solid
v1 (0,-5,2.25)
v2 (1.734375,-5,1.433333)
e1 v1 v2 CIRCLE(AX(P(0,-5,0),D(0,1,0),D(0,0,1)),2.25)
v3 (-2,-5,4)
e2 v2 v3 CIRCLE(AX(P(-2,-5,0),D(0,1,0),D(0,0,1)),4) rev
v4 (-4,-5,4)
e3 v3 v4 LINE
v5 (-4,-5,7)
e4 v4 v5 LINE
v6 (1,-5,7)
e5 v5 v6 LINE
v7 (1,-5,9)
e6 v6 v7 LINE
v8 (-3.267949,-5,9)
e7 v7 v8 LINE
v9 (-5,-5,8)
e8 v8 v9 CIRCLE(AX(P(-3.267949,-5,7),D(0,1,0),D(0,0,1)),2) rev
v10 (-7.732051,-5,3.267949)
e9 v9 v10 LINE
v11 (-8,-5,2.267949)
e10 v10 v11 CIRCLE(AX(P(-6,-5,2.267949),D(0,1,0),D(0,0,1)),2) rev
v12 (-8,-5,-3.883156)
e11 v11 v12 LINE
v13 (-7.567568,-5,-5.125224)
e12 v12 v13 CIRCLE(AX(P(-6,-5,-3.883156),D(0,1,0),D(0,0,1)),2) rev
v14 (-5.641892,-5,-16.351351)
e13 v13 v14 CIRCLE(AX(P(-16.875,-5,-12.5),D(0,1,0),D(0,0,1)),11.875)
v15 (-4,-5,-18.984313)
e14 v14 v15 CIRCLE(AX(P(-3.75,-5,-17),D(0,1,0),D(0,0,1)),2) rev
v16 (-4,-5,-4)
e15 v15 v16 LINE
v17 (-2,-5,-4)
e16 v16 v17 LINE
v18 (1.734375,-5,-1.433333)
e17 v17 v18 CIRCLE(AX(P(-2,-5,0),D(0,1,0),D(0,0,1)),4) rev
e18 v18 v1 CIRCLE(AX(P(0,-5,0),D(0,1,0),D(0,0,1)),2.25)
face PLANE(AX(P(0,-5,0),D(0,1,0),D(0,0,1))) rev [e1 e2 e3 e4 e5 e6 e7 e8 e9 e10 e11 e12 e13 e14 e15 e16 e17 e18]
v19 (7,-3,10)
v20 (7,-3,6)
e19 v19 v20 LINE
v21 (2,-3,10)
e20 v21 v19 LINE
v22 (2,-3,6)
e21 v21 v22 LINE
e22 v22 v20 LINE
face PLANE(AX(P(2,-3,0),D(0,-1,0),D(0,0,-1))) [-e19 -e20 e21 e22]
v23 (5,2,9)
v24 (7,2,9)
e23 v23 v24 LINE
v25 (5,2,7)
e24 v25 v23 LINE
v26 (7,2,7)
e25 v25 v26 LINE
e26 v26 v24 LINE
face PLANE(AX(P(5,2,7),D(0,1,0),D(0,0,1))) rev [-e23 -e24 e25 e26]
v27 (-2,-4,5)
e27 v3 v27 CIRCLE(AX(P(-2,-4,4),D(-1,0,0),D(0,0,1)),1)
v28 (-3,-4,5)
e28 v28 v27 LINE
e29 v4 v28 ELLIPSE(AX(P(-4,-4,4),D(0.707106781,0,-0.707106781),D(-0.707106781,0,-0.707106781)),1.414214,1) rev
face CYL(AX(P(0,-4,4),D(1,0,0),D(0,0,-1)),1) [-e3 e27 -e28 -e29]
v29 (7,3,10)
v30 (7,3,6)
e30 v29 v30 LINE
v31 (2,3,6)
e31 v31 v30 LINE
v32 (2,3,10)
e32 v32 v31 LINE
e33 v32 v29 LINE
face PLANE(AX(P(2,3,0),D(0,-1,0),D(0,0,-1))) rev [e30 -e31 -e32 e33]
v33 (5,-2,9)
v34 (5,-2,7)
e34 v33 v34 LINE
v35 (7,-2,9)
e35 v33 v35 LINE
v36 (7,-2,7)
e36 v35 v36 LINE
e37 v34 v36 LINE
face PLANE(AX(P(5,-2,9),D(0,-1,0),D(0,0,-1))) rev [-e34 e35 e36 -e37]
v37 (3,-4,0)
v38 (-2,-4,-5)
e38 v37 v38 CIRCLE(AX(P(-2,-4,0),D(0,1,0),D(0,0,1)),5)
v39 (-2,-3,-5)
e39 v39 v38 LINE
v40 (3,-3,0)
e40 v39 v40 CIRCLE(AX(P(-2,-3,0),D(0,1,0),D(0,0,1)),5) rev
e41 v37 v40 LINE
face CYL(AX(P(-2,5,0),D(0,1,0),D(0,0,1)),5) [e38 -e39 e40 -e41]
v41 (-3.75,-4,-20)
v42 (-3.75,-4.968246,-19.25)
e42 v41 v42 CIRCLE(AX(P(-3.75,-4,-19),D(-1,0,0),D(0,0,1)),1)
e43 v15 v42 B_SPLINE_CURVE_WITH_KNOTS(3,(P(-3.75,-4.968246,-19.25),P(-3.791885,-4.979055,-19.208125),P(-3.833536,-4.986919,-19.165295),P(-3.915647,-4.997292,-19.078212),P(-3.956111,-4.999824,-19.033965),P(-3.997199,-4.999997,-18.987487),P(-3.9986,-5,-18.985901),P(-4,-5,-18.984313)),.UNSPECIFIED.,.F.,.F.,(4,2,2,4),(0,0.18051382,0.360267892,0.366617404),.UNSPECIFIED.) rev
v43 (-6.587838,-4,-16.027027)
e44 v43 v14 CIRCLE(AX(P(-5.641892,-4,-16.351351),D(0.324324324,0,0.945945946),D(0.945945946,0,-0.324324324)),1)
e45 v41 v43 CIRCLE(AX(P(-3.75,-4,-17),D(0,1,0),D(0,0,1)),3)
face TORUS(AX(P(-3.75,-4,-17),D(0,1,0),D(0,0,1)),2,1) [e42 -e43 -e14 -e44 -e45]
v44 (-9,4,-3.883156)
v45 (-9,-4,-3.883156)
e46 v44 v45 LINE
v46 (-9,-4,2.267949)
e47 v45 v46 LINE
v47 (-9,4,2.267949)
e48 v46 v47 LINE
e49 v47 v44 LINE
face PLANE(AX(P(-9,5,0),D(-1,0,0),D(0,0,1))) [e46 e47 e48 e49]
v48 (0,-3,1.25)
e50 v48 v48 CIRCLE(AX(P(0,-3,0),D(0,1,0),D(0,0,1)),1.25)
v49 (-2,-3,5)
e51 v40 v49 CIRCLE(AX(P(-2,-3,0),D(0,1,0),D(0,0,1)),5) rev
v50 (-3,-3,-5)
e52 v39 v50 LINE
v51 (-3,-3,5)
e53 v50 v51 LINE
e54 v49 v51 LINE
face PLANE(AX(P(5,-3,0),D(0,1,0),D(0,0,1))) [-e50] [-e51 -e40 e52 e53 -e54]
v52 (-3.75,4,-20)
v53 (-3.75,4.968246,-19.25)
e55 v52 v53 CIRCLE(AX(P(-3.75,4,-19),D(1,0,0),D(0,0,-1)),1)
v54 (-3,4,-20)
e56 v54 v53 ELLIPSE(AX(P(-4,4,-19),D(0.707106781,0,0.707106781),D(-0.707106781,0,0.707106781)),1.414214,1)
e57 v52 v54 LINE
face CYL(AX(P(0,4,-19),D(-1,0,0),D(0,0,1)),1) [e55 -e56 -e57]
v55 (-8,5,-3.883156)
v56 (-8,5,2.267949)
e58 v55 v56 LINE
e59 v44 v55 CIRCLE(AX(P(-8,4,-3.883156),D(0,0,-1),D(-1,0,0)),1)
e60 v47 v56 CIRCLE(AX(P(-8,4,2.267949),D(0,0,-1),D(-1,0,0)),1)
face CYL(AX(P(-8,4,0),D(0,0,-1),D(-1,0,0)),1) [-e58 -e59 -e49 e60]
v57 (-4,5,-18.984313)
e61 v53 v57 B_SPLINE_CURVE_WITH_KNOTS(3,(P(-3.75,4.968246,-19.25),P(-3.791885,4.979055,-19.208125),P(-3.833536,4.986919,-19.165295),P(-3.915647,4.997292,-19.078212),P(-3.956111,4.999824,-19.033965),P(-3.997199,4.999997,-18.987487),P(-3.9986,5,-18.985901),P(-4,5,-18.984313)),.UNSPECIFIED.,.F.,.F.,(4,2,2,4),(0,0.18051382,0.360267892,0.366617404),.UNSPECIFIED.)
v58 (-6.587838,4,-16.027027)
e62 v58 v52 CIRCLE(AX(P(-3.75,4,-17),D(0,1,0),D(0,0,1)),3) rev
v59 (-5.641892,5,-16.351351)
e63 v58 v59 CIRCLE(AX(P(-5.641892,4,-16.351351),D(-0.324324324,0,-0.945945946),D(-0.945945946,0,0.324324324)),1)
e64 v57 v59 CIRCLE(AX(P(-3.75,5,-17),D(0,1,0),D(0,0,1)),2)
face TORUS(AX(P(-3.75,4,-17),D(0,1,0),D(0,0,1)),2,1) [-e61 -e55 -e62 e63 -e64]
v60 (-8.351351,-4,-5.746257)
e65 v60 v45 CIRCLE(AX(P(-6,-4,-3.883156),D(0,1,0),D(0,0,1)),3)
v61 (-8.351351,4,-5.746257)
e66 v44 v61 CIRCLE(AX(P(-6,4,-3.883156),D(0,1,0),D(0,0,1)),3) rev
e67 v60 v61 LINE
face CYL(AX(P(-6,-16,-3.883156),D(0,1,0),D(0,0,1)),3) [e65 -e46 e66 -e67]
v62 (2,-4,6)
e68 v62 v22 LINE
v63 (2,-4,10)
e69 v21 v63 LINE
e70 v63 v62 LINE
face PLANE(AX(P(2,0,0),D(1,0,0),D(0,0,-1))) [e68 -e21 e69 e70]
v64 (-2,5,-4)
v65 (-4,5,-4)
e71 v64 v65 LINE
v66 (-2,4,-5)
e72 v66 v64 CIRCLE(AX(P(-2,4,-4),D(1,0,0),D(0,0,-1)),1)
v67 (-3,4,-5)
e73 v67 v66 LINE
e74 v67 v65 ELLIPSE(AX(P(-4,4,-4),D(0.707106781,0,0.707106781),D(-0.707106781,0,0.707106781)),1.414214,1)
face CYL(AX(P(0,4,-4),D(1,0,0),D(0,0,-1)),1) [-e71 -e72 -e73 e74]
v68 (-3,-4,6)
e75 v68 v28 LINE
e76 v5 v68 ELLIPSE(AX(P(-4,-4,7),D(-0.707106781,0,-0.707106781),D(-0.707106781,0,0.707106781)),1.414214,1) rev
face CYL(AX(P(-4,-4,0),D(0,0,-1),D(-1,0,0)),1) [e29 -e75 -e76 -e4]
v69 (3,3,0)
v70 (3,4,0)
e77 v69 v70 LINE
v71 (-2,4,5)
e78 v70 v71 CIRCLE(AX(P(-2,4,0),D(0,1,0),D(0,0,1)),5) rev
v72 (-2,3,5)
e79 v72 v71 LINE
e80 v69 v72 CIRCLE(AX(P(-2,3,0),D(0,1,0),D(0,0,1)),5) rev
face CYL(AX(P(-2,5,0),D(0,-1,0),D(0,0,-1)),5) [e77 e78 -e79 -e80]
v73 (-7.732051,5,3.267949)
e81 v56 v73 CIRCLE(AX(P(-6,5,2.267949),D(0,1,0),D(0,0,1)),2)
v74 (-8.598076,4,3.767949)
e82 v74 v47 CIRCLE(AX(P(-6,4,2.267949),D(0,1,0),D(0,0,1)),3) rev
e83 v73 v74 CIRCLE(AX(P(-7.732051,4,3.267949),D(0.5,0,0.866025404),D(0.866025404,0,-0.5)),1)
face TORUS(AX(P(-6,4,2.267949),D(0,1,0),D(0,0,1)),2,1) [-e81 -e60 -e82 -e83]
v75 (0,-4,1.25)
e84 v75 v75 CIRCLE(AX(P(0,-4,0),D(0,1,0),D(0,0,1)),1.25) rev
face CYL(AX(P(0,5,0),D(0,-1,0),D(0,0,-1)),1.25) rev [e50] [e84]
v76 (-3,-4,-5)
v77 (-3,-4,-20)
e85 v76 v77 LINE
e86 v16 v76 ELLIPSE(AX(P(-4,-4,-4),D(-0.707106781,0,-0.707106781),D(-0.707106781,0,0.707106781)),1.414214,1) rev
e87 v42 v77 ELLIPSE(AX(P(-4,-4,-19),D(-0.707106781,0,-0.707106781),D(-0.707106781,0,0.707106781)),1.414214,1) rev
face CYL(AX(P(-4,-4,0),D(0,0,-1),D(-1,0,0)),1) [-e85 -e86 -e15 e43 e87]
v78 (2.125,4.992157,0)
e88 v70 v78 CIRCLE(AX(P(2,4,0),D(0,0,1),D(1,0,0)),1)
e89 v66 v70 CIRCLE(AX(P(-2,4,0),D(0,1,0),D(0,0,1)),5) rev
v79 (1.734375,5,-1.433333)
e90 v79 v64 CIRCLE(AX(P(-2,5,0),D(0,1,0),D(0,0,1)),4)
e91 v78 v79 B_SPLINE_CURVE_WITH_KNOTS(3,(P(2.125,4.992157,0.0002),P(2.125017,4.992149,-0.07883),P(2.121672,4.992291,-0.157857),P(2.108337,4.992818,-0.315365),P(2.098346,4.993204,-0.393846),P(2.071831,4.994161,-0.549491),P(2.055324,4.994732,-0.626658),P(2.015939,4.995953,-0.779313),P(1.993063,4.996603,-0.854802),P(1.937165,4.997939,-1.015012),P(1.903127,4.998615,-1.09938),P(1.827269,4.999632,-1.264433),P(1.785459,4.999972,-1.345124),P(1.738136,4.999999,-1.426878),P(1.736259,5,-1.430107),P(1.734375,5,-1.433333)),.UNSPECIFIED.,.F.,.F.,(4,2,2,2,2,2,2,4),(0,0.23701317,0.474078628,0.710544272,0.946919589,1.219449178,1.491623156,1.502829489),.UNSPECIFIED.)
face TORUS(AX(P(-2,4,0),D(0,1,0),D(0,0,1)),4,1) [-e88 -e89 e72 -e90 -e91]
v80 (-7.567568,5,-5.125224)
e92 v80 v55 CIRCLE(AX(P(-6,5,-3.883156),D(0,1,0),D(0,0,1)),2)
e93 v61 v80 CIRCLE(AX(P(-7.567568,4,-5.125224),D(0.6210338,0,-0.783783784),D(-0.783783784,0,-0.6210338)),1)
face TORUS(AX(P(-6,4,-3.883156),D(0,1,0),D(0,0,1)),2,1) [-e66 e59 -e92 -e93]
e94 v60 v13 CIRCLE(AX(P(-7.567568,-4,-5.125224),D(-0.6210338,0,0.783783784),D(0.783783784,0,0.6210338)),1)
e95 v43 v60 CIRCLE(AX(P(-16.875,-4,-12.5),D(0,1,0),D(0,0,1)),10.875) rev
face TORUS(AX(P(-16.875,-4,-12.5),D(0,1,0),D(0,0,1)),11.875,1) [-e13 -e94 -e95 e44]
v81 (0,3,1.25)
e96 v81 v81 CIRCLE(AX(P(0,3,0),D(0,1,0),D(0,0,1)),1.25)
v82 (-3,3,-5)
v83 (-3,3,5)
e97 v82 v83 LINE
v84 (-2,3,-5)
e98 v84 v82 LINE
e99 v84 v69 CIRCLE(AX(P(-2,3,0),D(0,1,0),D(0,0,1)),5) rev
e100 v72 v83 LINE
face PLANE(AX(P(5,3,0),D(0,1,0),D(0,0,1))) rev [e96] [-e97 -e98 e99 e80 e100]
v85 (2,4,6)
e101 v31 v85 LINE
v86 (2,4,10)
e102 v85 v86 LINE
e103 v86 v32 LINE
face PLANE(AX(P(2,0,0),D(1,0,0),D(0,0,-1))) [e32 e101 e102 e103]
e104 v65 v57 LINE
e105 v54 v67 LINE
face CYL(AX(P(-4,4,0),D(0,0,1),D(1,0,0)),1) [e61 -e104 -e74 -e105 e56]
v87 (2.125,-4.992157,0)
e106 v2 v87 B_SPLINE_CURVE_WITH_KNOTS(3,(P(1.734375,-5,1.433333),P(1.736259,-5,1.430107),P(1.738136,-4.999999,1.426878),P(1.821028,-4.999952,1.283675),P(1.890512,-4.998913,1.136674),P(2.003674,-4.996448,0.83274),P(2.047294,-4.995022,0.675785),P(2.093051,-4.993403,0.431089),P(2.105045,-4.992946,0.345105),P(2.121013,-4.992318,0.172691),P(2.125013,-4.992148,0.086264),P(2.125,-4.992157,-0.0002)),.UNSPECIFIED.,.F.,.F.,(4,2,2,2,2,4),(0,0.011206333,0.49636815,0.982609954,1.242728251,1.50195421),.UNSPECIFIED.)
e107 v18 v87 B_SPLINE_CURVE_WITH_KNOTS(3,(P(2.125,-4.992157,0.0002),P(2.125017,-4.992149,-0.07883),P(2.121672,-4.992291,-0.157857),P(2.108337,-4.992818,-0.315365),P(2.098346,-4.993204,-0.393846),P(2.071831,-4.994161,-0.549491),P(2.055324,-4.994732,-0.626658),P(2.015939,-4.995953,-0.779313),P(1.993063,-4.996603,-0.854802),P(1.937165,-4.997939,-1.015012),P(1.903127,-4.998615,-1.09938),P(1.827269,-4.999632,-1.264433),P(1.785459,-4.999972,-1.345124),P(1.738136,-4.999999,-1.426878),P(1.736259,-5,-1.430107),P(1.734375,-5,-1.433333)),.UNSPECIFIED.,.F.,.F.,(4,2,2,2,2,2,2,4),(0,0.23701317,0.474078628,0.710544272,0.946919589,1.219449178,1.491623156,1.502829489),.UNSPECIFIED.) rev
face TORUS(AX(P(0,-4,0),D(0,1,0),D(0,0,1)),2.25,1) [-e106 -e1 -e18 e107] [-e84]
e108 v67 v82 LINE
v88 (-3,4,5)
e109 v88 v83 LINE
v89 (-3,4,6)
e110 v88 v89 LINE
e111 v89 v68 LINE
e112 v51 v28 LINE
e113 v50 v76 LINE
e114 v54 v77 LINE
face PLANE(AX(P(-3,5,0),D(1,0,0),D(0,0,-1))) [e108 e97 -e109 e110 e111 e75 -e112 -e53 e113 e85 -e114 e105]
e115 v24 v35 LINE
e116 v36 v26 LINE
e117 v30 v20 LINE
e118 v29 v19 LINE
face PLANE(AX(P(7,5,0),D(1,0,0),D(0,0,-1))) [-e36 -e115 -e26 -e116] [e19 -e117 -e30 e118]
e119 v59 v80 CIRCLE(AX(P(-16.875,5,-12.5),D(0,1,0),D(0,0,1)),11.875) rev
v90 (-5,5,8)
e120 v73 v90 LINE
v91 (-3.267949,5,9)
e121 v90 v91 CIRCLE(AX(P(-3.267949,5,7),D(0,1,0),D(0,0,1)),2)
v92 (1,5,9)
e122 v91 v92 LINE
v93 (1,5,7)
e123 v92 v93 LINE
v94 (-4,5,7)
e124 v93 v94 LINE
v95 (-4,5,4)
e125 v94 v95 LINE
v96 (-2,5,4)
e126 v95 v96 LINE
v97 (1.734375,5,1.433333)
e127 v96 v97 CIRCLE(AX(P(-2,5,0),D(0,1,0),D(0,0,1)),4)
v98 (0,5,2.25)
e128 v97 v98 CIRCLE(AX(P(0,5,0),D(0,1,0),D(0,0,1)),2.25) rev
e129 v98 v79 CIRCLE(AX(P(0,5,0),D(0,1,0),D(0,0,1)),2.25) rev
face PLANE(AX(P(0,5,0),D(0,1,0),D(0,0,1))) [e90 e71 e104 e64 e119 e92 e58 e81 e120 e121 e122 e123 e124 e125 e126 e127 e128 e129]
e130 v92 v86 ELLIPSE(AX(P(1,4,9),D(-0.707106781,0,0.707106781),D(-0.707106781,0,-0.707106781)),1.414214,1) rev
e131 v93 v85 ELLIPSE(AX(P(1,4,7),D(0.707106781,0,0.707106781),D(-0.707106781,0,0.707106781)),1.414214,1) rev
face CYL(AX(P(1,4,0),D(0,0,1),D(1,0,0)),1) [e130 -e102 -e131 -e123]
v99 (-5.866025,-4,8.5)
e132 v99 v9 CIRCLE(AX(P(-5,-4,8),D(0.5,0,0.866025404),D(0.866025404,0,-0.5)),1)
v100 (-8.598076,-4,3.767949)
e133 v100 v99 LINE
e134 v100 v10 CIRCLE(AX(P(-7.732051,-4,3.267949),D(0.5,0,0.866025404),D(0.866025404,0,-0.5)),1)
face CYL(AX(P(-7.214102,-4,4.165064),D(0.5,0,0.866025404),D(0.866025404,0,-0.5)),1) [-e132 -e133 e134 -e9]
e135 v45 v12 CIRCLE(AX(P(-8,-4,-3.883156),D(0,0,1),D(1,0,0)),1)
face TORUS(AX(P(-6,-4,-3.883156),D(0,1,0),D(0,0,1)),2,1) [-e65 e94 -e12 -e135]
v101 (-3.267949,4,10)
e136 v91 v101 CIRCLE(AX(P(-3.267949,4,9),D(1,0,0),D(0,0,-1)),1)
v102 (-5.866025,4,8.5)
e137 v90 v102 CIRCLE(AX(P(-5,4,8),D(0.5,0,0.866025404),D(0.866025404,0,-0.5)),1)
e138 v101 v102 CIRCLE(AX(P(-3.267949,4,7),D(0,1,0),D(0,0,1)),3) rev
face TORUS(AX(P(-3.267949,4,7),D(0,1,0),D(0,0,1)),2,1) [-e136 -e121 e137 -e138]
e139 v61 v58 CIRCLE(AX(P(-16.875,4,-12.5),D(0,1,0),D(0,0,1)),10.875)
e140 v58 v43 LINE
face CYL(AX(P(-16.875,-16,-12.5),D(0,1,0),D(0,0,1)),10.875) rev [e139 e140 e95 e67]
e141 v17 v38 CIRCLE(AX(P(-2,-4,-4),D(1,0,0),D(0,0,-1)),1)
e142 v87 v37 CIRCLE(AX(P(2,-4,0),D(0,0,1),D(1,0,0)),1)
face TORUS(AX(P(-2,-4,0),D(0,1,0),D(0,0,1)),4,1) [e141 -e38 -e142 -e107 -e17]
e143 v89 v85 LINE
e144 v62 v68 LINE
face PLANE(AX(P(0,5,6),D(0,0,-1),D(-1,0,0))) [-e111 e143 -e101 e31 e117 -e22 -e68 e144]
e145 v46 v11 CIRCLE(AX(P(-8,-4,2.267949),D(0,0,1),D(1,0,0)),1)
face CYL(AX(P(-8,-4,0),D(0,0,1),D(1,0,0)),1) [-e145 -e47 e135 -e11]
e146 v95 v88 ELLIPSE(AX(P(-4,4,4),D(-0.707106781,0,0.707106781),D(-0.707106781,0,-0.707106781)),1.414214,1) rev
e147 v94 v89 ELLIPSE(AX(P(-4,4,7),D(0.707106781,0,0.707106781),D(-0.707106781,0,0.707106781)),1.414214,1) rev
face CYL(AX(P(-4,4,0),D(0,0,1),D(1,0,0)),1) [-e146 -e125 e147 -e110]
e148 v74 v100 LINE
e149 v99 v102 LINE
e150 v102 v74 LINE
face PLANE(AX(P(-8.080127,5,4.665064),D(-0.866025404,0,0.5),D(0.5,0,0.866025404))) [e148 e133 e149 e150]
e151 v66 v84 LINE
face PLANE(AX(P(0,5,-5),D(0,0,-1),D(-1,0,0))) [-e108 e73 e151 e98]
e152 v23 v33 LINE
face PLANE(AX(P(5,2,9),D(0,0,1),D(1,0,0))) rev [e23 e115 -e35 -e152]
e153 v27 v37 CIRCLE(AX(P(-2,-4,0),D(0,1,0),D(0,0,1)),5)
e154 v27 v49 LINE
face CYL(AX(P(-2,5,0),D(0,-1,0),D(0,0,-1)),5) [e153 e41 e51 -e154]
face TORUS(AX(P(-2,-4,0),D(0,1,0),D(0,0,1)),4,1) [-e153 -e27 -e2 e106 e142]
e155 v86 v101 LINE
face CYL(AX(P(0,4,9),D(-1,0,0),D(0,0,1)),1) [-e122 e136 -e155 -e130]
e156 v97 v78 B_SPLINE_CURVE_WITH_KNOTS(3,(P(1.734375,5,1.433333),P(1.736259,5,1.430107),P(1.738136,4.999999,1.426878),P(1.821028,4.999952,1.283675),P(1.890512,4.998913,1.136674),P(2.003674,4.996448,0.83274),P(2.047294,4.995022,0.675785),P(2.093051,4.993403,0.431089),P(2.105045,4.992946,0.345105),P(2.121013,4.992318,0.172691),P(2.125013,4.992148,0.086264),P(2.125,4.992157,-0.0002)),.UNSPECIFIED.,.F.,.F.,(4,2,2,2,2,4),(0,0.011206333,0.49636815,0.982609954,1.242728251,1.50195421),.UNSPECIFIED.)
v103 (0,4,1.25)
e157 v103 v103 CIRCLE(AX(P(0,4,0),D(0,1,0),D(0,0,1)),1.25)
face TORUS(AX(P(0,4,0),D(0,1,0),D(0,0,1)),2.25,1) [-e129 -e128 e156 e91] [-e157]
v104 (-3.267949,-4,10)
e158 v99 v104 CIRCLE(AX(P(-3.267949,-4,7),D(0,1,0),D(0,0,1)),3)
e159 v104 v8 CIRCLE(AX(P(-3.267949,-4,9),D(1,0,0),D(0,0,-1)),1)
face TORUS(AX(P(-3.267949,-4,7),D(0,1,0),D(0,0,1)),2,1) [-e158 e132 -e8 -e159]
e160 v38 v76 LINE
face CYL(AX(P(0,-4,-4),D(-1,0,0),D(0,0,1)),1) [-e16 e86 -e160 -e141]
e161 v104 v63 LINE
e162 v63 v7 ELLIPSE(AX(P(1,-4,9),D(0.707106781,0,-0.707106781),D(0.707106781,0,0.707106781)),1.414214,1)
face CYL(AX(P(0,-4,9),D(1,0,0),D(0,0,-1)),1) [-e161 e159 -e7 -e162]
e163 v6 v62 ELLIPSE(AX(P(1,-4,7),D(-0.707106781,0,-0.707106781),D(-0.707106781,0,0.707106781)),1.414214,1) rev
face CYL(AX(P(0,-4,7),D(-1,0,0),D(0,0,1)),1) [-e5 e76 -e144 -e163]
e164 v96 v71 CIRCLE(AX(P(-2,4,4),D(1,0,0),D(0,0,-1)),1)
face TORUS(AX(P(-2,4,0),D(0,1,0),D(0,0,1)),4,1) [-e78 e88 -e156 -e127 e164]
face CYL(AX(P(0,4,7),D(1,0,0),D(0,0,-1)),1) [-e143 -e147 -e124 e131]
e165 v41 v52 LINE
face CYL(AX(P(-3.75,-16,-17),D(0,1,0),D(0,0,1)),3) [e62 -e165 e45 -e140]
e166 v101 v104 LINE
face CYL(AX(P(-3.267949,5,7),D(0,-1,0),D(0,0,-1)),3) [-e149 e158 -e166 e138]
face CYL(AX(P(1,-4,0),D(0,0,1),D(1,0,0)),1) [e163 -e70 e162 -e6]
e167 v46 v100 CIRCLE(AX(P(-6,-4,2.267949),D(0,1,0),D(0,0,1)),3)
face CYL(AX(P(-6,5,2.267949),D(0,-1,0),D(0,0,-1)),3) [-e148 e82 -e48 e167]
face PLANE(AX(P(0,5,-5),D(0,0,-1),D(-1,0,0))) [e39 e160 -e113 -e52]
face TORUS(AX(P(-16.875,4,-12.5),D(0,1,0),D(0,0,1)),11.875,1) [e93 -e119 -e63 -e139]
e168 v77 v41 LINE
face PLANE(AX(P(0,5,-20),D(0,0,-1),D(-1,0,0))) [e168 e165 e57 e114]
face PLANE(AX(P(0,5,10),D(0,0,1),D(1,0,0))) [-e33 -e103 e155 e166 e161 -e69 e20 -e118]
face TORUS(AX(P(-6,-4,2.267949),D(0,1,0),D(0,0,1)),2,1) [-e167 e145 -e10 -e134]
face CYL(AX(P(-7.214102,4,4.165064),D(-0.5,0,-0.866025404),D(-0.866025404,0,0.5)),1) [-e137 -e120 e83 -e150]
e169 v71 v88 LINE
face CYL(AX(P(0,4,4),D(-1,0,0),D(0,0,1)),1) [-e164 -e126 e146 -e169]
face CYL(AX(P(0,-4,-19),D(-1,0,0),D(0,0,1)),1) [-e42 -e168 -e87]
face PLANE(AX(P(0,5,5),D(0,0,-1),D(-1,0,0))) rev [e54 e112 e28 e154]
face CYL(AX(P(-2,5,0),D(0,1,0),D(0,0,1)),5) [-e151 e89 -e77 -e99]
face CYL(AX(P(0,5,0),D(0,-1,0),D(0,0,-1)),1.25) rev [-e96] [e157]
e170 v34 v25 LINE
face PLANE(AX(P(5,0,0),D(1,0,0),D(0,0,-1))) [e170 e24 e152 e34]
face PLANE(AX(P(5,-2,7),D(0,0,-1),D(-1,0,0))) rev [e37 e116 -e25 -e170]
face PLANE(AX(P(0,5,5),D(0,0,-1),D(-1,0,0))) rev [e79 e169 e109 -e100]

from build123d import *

# Parameters (mm, degrees)
CROQUIS1_W                 = 6
CROQUIS1_H                 = 10
CROQUIS1_R                 = 1.25
SALIENTE_EXTRUIR1_DEPTH    = 5
REDONDEO1_R                = 5
CROQUIS2_W                 = 4
CROQUIS2_H                 = 2
CORTAR_EXTRUIR1_DEPTH      = 5
CORTAR_EXTRUIR2_DEPTH      = 5
CORTAR_EXTRUIR2_DEPTH_BACK = 3
CROQUIS3_W                 = 5
CROQUIS3_H                 = 6
CROQUIS4_W                 = 2
CROQUIS4_H                 = 4
CORTAR_EXTRUIR3_DEPTH      = 2
CORTAR_EXTRUIR4_DEPTH      = 16
REDONDEO2_R                = 3
REDONDEO3_R                = 3
REDONDEO4_R                = 1


# Some blends are built 0.0001 mm under size
with BuildPart() as part:
    # Croquis1 → Saliente-Extruir1 (new, symmetric)
    # profile 1 of 2: a face of its own
    with BuildSketch(Plane(origin=(0, 0, 0), x_dir=(1, 0, 0), z_dir=(0, 1, 0))):
        Polygon((-3, -6), (-3, -5), (-3, 5), (-3, 20), (-9, 20), (-9, -3.07179677), (-5, -10), (7, -10), (7, -6), align=None)
    # profile 2 of 2: a face of its own
    with BuildSketch(Plane(origin=(0, 0, 0), x_dir=(1, 0, 0), z_dir=(0, 1, 0))):
        Rectangle(CROQUIS1_W, CROQUIS1_H)
        with Locations(Location((0, 0, 0), (0, 0, 270))):
            Circle(CROQUIS1_R, mode=Mode.SUBTRACT)
    extrude(amount=SALIENTE_EXTRUIR1_DEPTH, both=True)

    # Redondeo1
    redondeo1_edges = [part.edges().sort_by_distance(p)[0] for p in [
        (3, 0, 5),
        (3, 0, -5),
    ]]
    fillet(redondeo1_edges, radius=REDONDEO1_R - 0.0001)  # a hair under: the kernel refuses the full size

    # Croquis2 → Cortar-Extruir1 (cut)
    with BuildSketch(Plane(origin=(7, 0, 0), x_dir=(0, 0, -1), z_dir=(1, 0, 0))):
        with Locations((-8, 4)):
            Rectangle(CROQUIS2_W, CROQUIS2_H)
        with Locations((-8, -4)):
            Rectangle(CROQUIS2_W, CROQUIS2_H)
    extrude(amount=-CORTAR_EXTRUIR1_DEPTH, mode=Mode.SUBTRACT)

    # Croquis3 → Cortar-Extruir2 (cut, two sides: drawn at the far end of the back side and taken through both)
    with BuildSketch(Plane(origin=(0, 0, 0), x_dir=(0, 0, -1), z_dir=(1, 0, 0)).offset(-CORTAR_EXTRUIR2_DEPTH_BACK)):
        with Locations((2.5, 0)):
            Rectangle(CROQUIS3_W, CROQUIS3_H)
        with Locations((-2.5, 0)):
            Rectangle(CROQUIS3_W, CROQUIS3_H)
    extrude(amount=CORTAR_EXTRUIR2_DEPTH + CORTAR_EXTRUIR2_DEPTH_BACK, mode=Mode.SUBTRACT)

    # Croquis4 → Cortar-Extruir3 (cut)
    with BuildSketch(Plane(origin=(7, 0, 0), x_dir=(0, 0, -1), z_dir=(1, 0, 0))):
        with Locations((-8, 0)):
            Rectangle(CROQUIS4_W, CROQUIS4_H)
    extrude(amount=-CORTAR_EXTRUIR3_DEPTH, mode=Mode.SUBTRACT)

    # Croquis5 → Cortar-Extruir4 (cut, symmetric)
    with BuildSketch(Plane(origin=(0, 0, 0), x_dir=(1, 0, 0), z_dir=(0, 1, 0))):
        with BuildLine():
            Line((-9, 20), (-9, 5))
            ThreePointArc((-9, 5), (-6, 12.5), (-9, 20))
        make_face()
    extrude(amount=CORTAR_EXTRUIR4_DEPTH, both=True, mode=Mode.SUBTRACT)

    # Redondeo2
    redondeo2_edges = [part.edges().sort_by_distance(p)[0] for p in [
        (-9, 0, -20),
    ]]
    fillet(redondeo2_edges, radius=REDONDEO2_R)

    # Redondeo3
    redondeo3_edges = [part.edges().sort_by_distance(p)[0] for p in [
        (-9, 0, -5),
        (-5, 0, 10),
        (-9, 0, 3.07179677),
    ]]
    fillet(redondeo3_edges, radius=REDONDEO3_R)

    # Redondeo4
    # the kernel refuses this fillet: 1 mm, written as the material it takes off along each edge
    with BuildSketch(Plane(origin=(2, -5, 12.5), x_dir=(-1, 0, 0), z_dir=(0, 0, -1)), Plane(origin=(2, 5, 3.5), x_dir=(-1, 0, 0), z_dir=(0, 0, 1))) as redondeo4_piece_1:
        with BuildLine():
            CenterArc((REDONDEO4_R, REDONDEO4_R), REDONDEO4_R, 180, 90)
            Line((0, REDONDEO4_R), (0, 0))
            Line((0, 0), (REDONDEO4_R, 0))
        make_face()
    extrude(amount=9, mode=Mode.SUBTRACT)
    with BuildSketch(Plane(origin=(4.5, -5, 6), x_dir=(0, 0, 1), z_dir=(-1, 0, 0)), Plane(origin=(4.5, 5, 6), x_dir=(0, -1, 0), z_dir=(-1, 0, 0))) as redondeo4_piece_2:
        with BuildLine():
            CenterArc((REDONDEO4_R, REDONDEO4_R), REDONDEO4_R, 180, 90)
            Line((0, REDONDEO4_R), (0, 0))
            Line((0, 0), (REDONDEO4_R, 0))
        make_face()
    extrude(amount=7.5, mode=Mode.SUBTRACT)
    with BuildSketch(Plane(origin=(-3, -5, 6), x_dir=(-1, 0, 0), z_dir=(0, 0, -1))) as redondeo4_piece_3:
        with BuildLine():
            CenterArc((REDONDEO4_R, REDONDEO4_R), REDONDEO4_R, 180, 90)
            Line((0, REDONDEO4_R), (0, 0))
            Line((0, 0), (REDONDEO4_R, 0))
        make_face()
    extrude(amount=1, mode=Mode.SUBTRACT)
    with BuildSketch(Plane(origin=(-3, -5, 5), x_dir=(0, 0, -1), z_dir=(1, 0, 0)), Plane(origin=(-1.9999, -5, -5), x_dir=(0, 0, 1), z_dir=(-1, 0, 0))) as redondeo4_piece_4:
        with BuildLine():
            CenterArc((REDONDEO4_R, REDONDEO4_R), REDONDEO4_R, 180, 90)
            Line((0, REDONDEO4_R), (0, 0))
            Line((0, 0), (REDONDEO4_R, 0))
        make_face()
    extrude(amount=1.0001, mode=Mode.SUBTRACT)
    with BuildSketch(Plane(origin=(-1.9999, -5, 0.0001), x_dir=(0, 0, 1), z_dir=(-1, 0, 0))) as redondeo4_piece_5:
        with BuildLine():
            CenterArc((4.9999 - REDONDEO4_R, REDONDEO4_R), REDONDEO4_R, 270, 90)
            Line((4.9999, REDONDEO4_R), (4.9999, 0))
            Line((4.9999, 0), (4.9999 - REDONDEO4_R, 0))
        make_face()
    revolve(axis=Axis((-1.9999, -5, 0.0001), (0, 1, 0)), revolution_arc=90, mode=Mode.SUBTRACT)
    with BuildSketch(Plane(origin=(-1.9999, -5, -0.0001), x_dir=(1, 0, 0), z_dir=(0, 0, 1))) as redondeo4_piece_6:
        with BuildLine():
            CenterArc((4.9999 - REDONDEO4_R, REDONDEO4_R), REDONDEO4_R, 270, 90)
            Line((4.9999, REDONDEO4_R), (4.9999, 0))
            Line((4.9999, 0), (4.9999 - REDONDEO4_R, 0))
        make_face()
    revolve(axis=Axis((-1.9999, -5, -0.0001), (0, 1, 0)), revolution_arc=90, mode=Mode.SUBTRACT)
    with BuildSketch(Plane(origin=(-3, -5, -5), x_dir=(-1, 0, 0), z_dir=(0, 0, -1))) as redondeo4_piece_7:
        with BuildLine():
            CenterArc((REDONDEO4_R, REDONDEO4_R), REDONDEO4_R, 180, 90)
            Line((0, REDONDEO4_R), (0, 0))
            Line((0, 0), (REDONDEO4_R, 0))
        make_face()
    extrude(amount=17.5, mode=Mode.SUBTRACT)
    with BuildSketch(Plane(origin=(-3.75, -5, -17), x_dir=(-0.9459459459459457, 0, 0.32432432432432523), z_dir=(0.32432432432432523, 0, 0.9459459459459457))) as redondeo4_piece_8:
        with BuildLine():
            CenterArc((3 - REDONDEO4_R, -REDONDEO4_R), REDONDEO4_R, 0, 90)
            Line((3, -REDONDEO4_R), (3, 0))
            Line((3, 0), (3 - REDONDEO4_R, 0))
        make_face()
    revolve(axis=Axis((-3.75, -5, -17), (0, -1, 0)), revolution_arc=108.924644416, mode=Mode.SUBTRACT)
    with BuildSketch(Plane(origin=(-16.875, -5, -12.5), x_dir=(0.7837837837837833, 0, 0.6210337996257335), z_dir=(-0.6210337996257335, 0, 0.7837837837837833))) as redondeo4_piece_9:
        with BuildLine():
            CenterArc((10.875 + REDONDEO4_R, REDONDEO4_R), REDONDEO4_R, 180, 90)
            Line((10.875, REDONDEO4_R), (10.875, 0))
            Line((10.875, 0), (10.875 + REDONDEO4_R, 0))
        make_face()
    revolve(axis=Axis((-16.875, -5, -12.5), (0, 1, 0)), revolution_arc=57.316311778, mode=Mode.SUBTRACT)
    with BuildSketch(Plane(origin=(-6, -5, -3.88315603), x_dir=(-0.7837837837837837, 0, -0.621033799625733), z_dir=(0.621033799625733, 0, -0.7837837837837837))) as redondeo4_piece_10:
        with BuildLine():
            CenterArc((3 - REDONDEO4_R, REDONDEO4_R), REDONDEO4_R, 270, 90)
            Line((3, REDONDEO4_R), (3, 0))
            Line((3, 0), (3 - REDONDEO4_R, 0))
        make_face()
    revolve(axis=Axis((-6, -5, -3.88315603), (0, 1, 0)), revolution_arc=38.391667362, mode=Mode.SUBTRACT)
    with BuildSketch(Plane(origin=(-9, -5, -3.88315603), x_dir=(1, 0, 0), z_dir=(0, 0, 1)), Plane(origin=(-9, 5, -3.88315603), x_dir=(0, -1, 0), z_dir=(0, 0, 1))) as redondeo4_piece_11:
        with BuildLine():
            CenterArc((REDONDEO4_R, REDONDEO4_R), REDONDEO4_R, 180, 90)
            Line((0, REDONDEO4_R), (0, 0))
            Line((0, 0), (REDONDEO4_R, 0))
        make_face()
    extrude(amount=6.151105223, mode=Mode.SUBTRACT)
    with BuildSketch(Plane(origin=(-6, -5, 2.267949192), x_dir=(-1, 0, 0), z_dir=(0, 0, -1))) as redondeo4_piece_12:
        with BuildLine():
            CenterArc((3 - REDONDEO4_R, REDONDEO4_R), REDONDEO4_R, 270, 90)
            Line((3, REDONDEO4_R), (3, 0))
            Line((3, 0), (3 - REDONDEO4_R, 0))
        make_face()
    revolve(axis=Axis((-6, -5, 2.267949192), (0, 1, 0)), revolution_arc=30, mode=Mode.SUBTRACT)
    with BuildSketch(Plane(origin=(-8.598076211, -5, 3.767949192), x_dir=(0.8660254037844396, 0, -0.4999999999999982), z_dir=(0.4999999999999983, 0, 0.8660254037844397)), Plane(origin=(-8.598076211, 5, 3.767949192), x_dir=(0, -1, 0), z_dir=(0.4999999999999983, 0, 0.8660254037844397))) as redondeo4_piece_13:
        with BuildLine():
            CenterArc((REDONDEO4_R, REDONDEO4_R), REDONDEO4_R, 180, 90)
            Line((0, REDONDEO4_R), (0, 0))
            Line((0, 0), (REDONDEO4_R, 0))
        make_face()
    extrude(amount=5.464101615, mode=Mode.SUBTRACT)
    with BuildSketch(Plane(origin=(-3.267949192, -5, 7), x_dir=(-0.8660254037844399, 0, 0.4999999999999977), z_dir=(-0.4999999999999977, 0, -0.8660254037844399))) as redondeo4_piece_14:
        with BuildLine():
            CenterArc((3 - REDONDEO4_R, REDONDEO4_R), REDONDEO4_R, 270, 90)
            Line((3, REDONDEO4_R), (3, 0))
            Line((3, 0), (3 - REDONDEO4_R, 0))
        make_face()
    revolve(axis=Axis((-3.267949192, -5, 7), (0, 1, 0)), revolution_arc=60, mode=Mode.SUBTRACT)
    with BuildSketch(Plane(origin=(-3.267949192, -5, 10), x_dir=(0, 0, -1), z_dir=(1, 0, 0)), Plane(origin=(-3.267949192, 5, 10), x_dir=(0, -1, 0), z_dir=(1, 0, 0))) as redondeo4_piece_15:
        with BuildLine():
            CenterArc((REDONDEO4_R, REDONDEO4_R), REDONDEO4_R, 180, 90)
            Line((0, REDONDEO4_R), (0, 0))
            Line((0, 0), (REDONDEO4_R, 0))
        make_face()
    extrude(amount=7.767949192, mode=Mode.SUBTRACT)
    with BuildSketch(Plane(origin=(0, -5, 0), x_dir=(0, 0, 1), z_dir=(-1, 0, 0))) as redondeo4_piece_16:
        with BuildLine():
            CenterArc((1.25 + REDONDEO4_R, REDONDEO4_R), REDONDEO4_R, 180, 90)
            Line((1.25, REDONDEO4_R), (1.25, 0))
            Line((1.25, 0), (1.25 + REDONDEO4_R, 0))
        make_face()
    revolve(axis=Axis((0, -5, 0), (0, 1, 0)), mode=Mode.SUBTRACT)
    with BuildSketch(Plane(origin=(0, 5, 0), x_dir=(0, 0, 1), z_dir=(-1, 0, 0))) as redondeo4_piece_17:
        with BuildLine():
            CenterArc((1.25 + REDONDEO4_R, -REDONDEO4_R), REDONDEO4_R, 90, 90)
            Line((1.25, -REDONDEO4_R), (1.25, 0))
            Line((1.25, 0), (1.25 + REDONDEO4_R, 0))
        make_face()
    revolve(axis=Axis((0, 5, 0), (0, 1, 0)), mode=Mode.SUBTRACT)
    with BuildSketch(Plane(origin=(-6, 5, 2.267949192), x_dir=(-1, 0, 0), z_dir=(0, 0, -1))) as redondeo4_piece_18:
        with BuildLine():
            CenterArc((3 - REDONDEO4_R, -REDONDEO4_R), REDONDEO4_R, 0, 90)
            Line((3 - REDONDEO4_R, 0), (3, 0))
            Line((3, 0), (3, -REDONDEO4_R))
        make_face()
    revolve(axis=Axis((-6, 5, 2.267949192), (0, 1, 0)), revolution_arc=30, mode=Mode.SUBTRACT)
    with BuildSketch(Plane(origin=(-6, 5, -3.88315603), x_dir=(-0.7837837837837837, 0, -0.621033799625733), z_dir=(0.621033799625733, 0, -0.7837837837837837))) as redondeo4_piece_19:
        with BuildLine():
            CenterArc((3 - REDONDEO4_R, -REDONDEO4_R), REDONDEO4_R, 0, 90)
            Line((3 - REDONDEO4_R, 0), (3, 0))
            Line((3, 0), (3, -REDONDEO4_R))
        make_face()
    revolve(axis=Axis((-6, 5, -3.88315603), (0, 1, 0)), revolution_arc=38.391667362, mode=Mode.SUBTRACT)
    with BuildSketch(Plane(origin=(-16.875, 5, -12.5), x_dir=(0.7837837837837833, 0, 0.6210337996257335), z_dir=(-0.6210337996257335, 0, 0.7837837837837833))) as redondeo4_piece_20:
        with BuildLine():
            CenterArc((10.875 + REDONDEO4_R, -REDONDEO4_R), REDONDEO4_R, 90, 90)
            Line((10.875 + REDONDEO4_R, 0), (10.875, 0))
            Line((10.875, 0), (10.875, -REDONDEO4_R))
        make_face()
    revolve(axis=Axis((-16.875, 5, -12.5), (0, 1, 0)), revolution_arc=57.316311778, mode=Mode.SUBTRACT)
    with BuildSketch(Plane(origin=(-3.75, 5, -17), x_dir=(-0.9459459459459457, 0, 0.32432432432432523), z_dir=(0.32432432432432523, 0, 0.9459459459459457))) as redondeo4_piece_21:
        with BuildLine():
            CenterArc((3 - REDONDEO4_R, REDONDEO4_R), REDONDEO4_R, 270, 90)
            Line((3 - REDONDEO4_R, 0), (3, 0))
            Line((3, 0), (3, REDONDEO4_R))
        make_face()
    revolve(axis=Axis((-3.75, 5, -17), (0, -1, 0)), revolution_arc=108.924644416, mode=Mode.SUBTRACT)
    with BuildSketch(Plane(origin=(-3, 5, -22.5), x_dir=(0, -1, 0), z_dir=(0, 0, 1))) as redondeo4_piece_22:
        with BuildLine():
            CenterArc((REDONDEO4_R, -REDONDEO4_R), REDONDEO4_R, 90, 90)
            Line((0, -REDONDEO4_R), (0, 0))
            Line((0, 0), (REDONDEO4_R, 0))
        make_face()
    extrude(amount=17.5, mode=Mode.SUBTRACT)
    with BuildSketch(Plane(origin=(-1.9999, 5, -5), x_dir=(0, 0, 1), z_dir=(-1, 0, 0)), Plane(origin=(-3, 5, 5), x_dir=(0, 0, -1), z_dir=(1, 0, 0))) as redondeo4_piece_23:
        with BuildLine():
            CenterArc((REDONDEO4_R, -REDONDEO4_R), REDONDEO4_R, 90, 90)
            Line((0, -REDONDEO4_R), (0, 0))
            Line((0, 0), (REDONDEO4_R, 0))
        make_face()
    extrude(amount=1.0001, mode=Mode.SUBTRACT)
    with BuildSketch(Plane(origin=(-1.9999, 5, -0.0001), x_dir=(1, 0, 0), z_dir=(0, 0, 1))) as redondeo4_piece_24:
        with BuildLine():
            CenterArc((4.9999 - REDONDEO4_R, -REDONDEO4_R), REDONDEO4_R, 0, 90)
            Line((4.9999, -REDONDEO4_R), (4.9999, 0))
            Line((4.9999, 0), (4.9999 - REDONDEO4_R, 0))
        make_face()
    revolve(axis=Axis((-1.9999, 5, -0.0001), (0, 1, 0)), revolution_arc=90, mode=Mode.SUBTRACT)
    with BuildSketch(Plane(origin=(-1.9999, 5, 0.0001), x_dir=(0, 0, 1), z_dir=(-1, 0, 0))) as redondeo4_piece_25:
        with BuildLine():
            CenterArc((4.9999 - REDONDEO4_R, -REDONDEO4_R), REDONDEO4_R, 0, 90)
            Line((4.9999, -REDONDEO4_R), (4.9999, 0))
            Line((4.9999, 0), (4.9999 - REDONDEO4_R, 0))
        make_face()
    revolve(axis=Axis((-1.9999, 5, 0.0001), (0, 1, 0)), revolution_arc=90, mode=Mode.SUBTRACT)
    with BuildSketch(Plane(origin=(-3, 5, 5), x_dir=(0, -1, 0), z_dir=(0, 0, 1))) as redondeo4_piece_26:
        with BuildLine():
            CenterArc((REDONDEO4_R, -REDONDEO4_R), REDONDEO4_R, 90, 90)
            Line((0, -REDONDEO4_R), (0, 0))
            Line((0, 0), (REDONDEO4_R, 0))
        make_face()
    extrude(amount=1, mode=Mode.SUBTRACT)
    with BuildSketch(Plane(origin=(-3.267949192, 5, 7), x_dir=(-0.8660254037844399, 0, 0.4999999999999977), z_dir=(-0.4999999999999977, 0, -0.8660254037844399))) as redondeo4_piece_27:
        with BuildLine():
            CenterArc((3 - REDONDEO4_R, -REDONDEO4_R), REDONDEO4_R, 0, 90)
            Line((3 - REDONDEO4_R, 0), (3, 0))
            Line((3, 0), (3, -REDONDEO4_R))
        make_face()
    revolve(axis=Axis((-3.267949192, 5, 7), (0, 1, 0)), revolution_arc=60, mode=Mode.SUBTRACT)
    with BuildSketch(Plane(origin=(3, 5, 0.0001), x_dir=(-1, 0, 0), z_dir=(0, 0, -1))) as redondeo4_piece_28:
        with BuildLine():
            CenterArc((REDONDEO4_R, -REDONDEO4_R), REDONDEO4_R, 90, 90)
            Line((0, -REDONDEO4_R), (0, 0))
            Line((0, 0), (REDONDEO4_R, 0))
        make_face()
    extrude(amount=0.0002, mode=Mode.SUBTRACT)
    with BuildSketch(Plane(origin=(-0.5, 5, -20), x_dir=(0, -1, 0), z_dir=(-1, 0, 0)), Plane(origin=(-0.5, -5, -20), x_dir=(0, 0, 1), z_dir=(-1, 0, 0))) as redondeo4_piece_29:
        with BuildLine():
            CenterArc((REDONDEO4_R, REDONDEO4_R), REDONDEO4_R, 180, 90)
            Line((0, REDONDEO4_R), (0, 0))
            Line((0, 0), (REDONDEO4_R, 0))
        make_face()
    extrude(amount=3.25, mode=Mode.SUBTRACT)
    with BuildSketch(Plane(origin=(3, -5, 0.0001), x_dir=(-1, 0, 0), z_dir=(0, 0, -1))) as redondeo4_piece_30:
        with BuildLine():
            CenterArc((REDONDEO4_R, REDONDEO4_R), REDONDEO4_R, 180, 90)
            Line((0, REDONDEO4_R), (0, 0))
            Line((0, 0), (REDONDEO4_R, 0))
        make_face()
    extrude(amount=0.0002, mode=Mode.SUBTRACT)
    with BuildSketch(Plane(origin=(4.5, -5, 6), x_dir=(0, 0, 1), z_dir=(-1, 0, 0))) as redondeo4_piece_31a_section:
        with BuildLine():
            CenterArc((REDONDEO4_R, REDONDEO4_R), REDONDEO4_R, 180, 90)
            Line((0, REDONDEO4_R), (0, 0))
            Line((0, 0), (REDONDEO4_R, 0))
        make_face()
    redondeo4_piece_31a = extrude(amount=10, mode=Mode.PRIVATE)
    redondeo4_piece_31a = split(redondeo4_piece_31a, bisect_by=Plane(origin=(-3, -4.773604886, 6.226395114), z_dir=(-1, 0, 0)), keep=Keep.TOP, mode=Mode.PRIVATE)
    with BuildSketch(Plane(origin=(-3, -5, 8.5), x_dir=(-1, 0, 0), z_dir=(0, 0, -1))) as redondeo4_piece_31b_section:
        with BuildLine():
            CenterArc((REDONDEO4_R, REDONDEO4_R), REDONDEO4_R, 180, 90)
            Line((0, REDONDEO4_R), (0, 0))
            Line((0, 0), (REDONDEO4_R, 0))
        make_face()
    redondeo4_piece_31b = extrude(amount=3.5, mode=Mode.PRIVATE)
    redondeo4_piece_31b = split(redondeo4_piece_31b, bisect_by=Plane(origin=(-3.226395114, -4.773604886, 6), z_dir=(0, 0, 1)), keep=Keep.TOP, mode=Mode.PRIVATE)
    redondeo4_piece_31 = redondeo4_piece_31a & redondeo4_piece_31b
    add(redondeo4_piece_31, mode=Mode.SUBTRACT)
    with BuildSketch(Plane(origin=(-5.5, -5, 5), x_dir=(0, 0, -1), z_dir=(1, 0, 0))) as redondeo4_piece_32a_section:
        with BuildLine():
            CenterArc((REDONDEO4_R, REDONDEO4_R), REDONDEO4_R, 180, 90)
            Line((0, REDONDEO4_R), (0, 0))
            Line((0, 0), (REDONDEO4_R, 0))
        make_face()
    redondeo4_piece_32a = extrude(amount=3.5001, mode=Mode.PRIVATE)
    redondeo4_piece_32a = split(redondeo4_piece_32a, bisect_by=Plane(origin=(-3, -4.773604886, 4.773604886), z_dir=(-1, 0, 0)), keep=Keep.TOP, mode=Mode.PRIVATE)
    with BuildSketch(Plane(origin=(-3, -5, 6), x_dir=(-1, 0, 0), z_dir=(0, 0, -1))) as redondeo4_piece_32b_section:
        with BuildLine():
            CenterArc((REDONDEO4_R, REDONDEO4_R), REDONDEO4_R, 180, 90)
            Line((0, REDONDEO4_R), (0, 0))
            Line((0, 0), (REDONDEO4_R, 0))
        make_face()
    redondeo4_piece_32b = extrude(amount=3.5, mode=Mode.PRIVATE)
    redondeo4_piece_32b = split(redondeo4_piece_32b, bisect_by=Plane(origin=(-3.226395114, -4.773604886, 5), z_dir=(0, 0, -1)), keep=Keep.TOP, mode=Mode.PRIVATE)
    redondeo4_piece_32 = redondeo4_piece_32a & redondeo4_piece_32b
    add(redondeo4_piece_32, mode=Mode.SUBTRACT)
    with BuildSketch(Plane(origin=(-3, -5, -2.5), x_dir=(-1, 0, 0), z_dir=(0, 0, -1))) as redondeo4_piece_33a_section:
        with BuildLine():
            CenterArc((REDONDEO4_R, REDONDEO4_R), REDONDEO4_R, 180, 90)
            Line((0, REDONDEO4_R), (0, 0))
            Line((0, 0), (REDONDEO4_R, 0))
        make_face()
    redondeo4_piece_33a = extrude(amount=20, mode=Mode.PRIVATE)
    redondeo4_piece_33a = split(redondeo4_piece_33a, bisect_by=Plane(origin=(-3.226395114, -4.773604886, -5), z_dir=(0, 0, 1)), keep=Keep.TOP, mode=Mode.PRIVATE)
    with BuildSketch(Plane(origin=(-1.9999, -5, -5), x_dir=(0, 0, 1), z_dir=(-1, 0, 0))) as redondeo4_piece_33b_section:
        with BuildLine():
            CenterArc((REDONDEO4_R, REDONDEO4_R), REDONDEO4_R, 180, 90)
            Line((0, REDONDEO4_R), (0, 0))
            Line((0, 0), (REDONDEO4_R, 0))
        make_face()
    redondeo4_piece_33b = extrude(amount=3.5001, mode=Mode.PRIVATE)
    redondeo4_piece_33b = split(redondeo4_piece_33b, bisect_by=Plane(origin=(-3, -4.773604886, -4.773604886), z_dir=(-1, 0, 0)), keep=Keep.TOP, mode=Mode.PRIVATE)
    redondeo4_piece_33 = redondeo4_piece_33a & redondeo4_piece_33b
    add(redondeo4_piece_33, mode=Mode.SUBTRACT)
    with BuildSketch(Plane(origin=(-3, 5, -22.5), x_dir=(0, -1, 0), z_dir=(0, 0, 1))) as redondeo4_piece_34a_section:
        with BuildLine():
            CenterArc((REDONDEO4_R, -REDONDEO4_R), REDONDEO4_R, 90, 90)
            Line((0, -REDONDEO4_R), (0, 0))
            Line((0, 0), (REDONDEO4_R, 0))
        make_face()
    redondeo4_piece_34a = extrude(amount=20, mode=Mode.PRIVATE)
    redondeo4_piece_34a = split(redondeo4_piece_34a, bisect_by=Plane(origin=(-3.226395114, 4.773604886, -5), z_dir=(0, 0, 1)), keep=Keep.TOP, mode=Mode.PRIVATE)
    with BuildSketch(Plane(origin=(-1.9999, 5, -5), x_dir=(0, 0, 1), z_dir=(-1, 0, 0))) as redondeo4_piece_34b_section:
        with BuildLine():
            CenterArc((REDONDEO4_R, -REDONDEO4_R), REDONDEO4_R, 90, 90)
            Line((0, -REDONDEO4_R), (0, 0))
            Line((0, 0), (REDONDEO4_R, 0))
        make_face()
    redondeo4_piece_34b = extrude(amount=3.5001, mode=Mode.PRIVATE)
    redondeo4_piece_34b = split(redondeo4_piece_34b, bisect_by=Plane(origin=(-3, 4.773604886, -4.773604886), z_dir=(-1, 0, 0)), keep=Keep.TOP, mode=Mode.PRIVATE)
    redondeo4_piece_34 = redondeo4_piece_34a & redondeo4_piece_34b
    add(redondeo4_piece_34, mode=Mode.SUBTRACT)
    with BuildSketch(Plane(origin=(-3, 5, 2.5), x_dir=(0, -1, 0), z_dir=(0, 0, 1))) as redondeo4_piece_35a_section:
        with BuildLine():
            CenterArc((REDONDEO4_R, -REDONDEO4_R), REDONDEO4_R, 90, 90)
            Line((0, -REDONDEO4_R), (0, 0))
            Line((0, 0), (REDONDEO4_R, 0))
        make_face()
    redondeo4_piece_35a = extrude(amount=3.5, mode=Mode.PRIVATE)
    redondeo4_piece_35a = split(redondeo4_piece_35a, bisect_by=Plane(origin=(-3.226395114, 4.773604886, 5), z_dir=(0, 0, -1)), keep=Keep.TOP, mode=Mode.PRIVATE)
    with BuildSketch(Plane(origin=(-5.5, 5, 5), x_dir=(0, 0, -1), z_dir=(1, 0, 0))) as redondeo4_piece_35b_section:
        with BuildLine():
            CenterArc((REDONDEO4_R, -REDONDEO4_R), REDONDEO4_R, 90, 90)
            Line((0, -REDONDEO4_R), (0, 0))
            Line((0, 0), (REDONDEO4_R, 0))
        make_face()
    redondeo4_piece_35b = extrude(amount=3.5001, mode=Mode.PRIVATE)
    redondeo4_piece_35b = split(redondeo4_piece_35b, bisect_by=Plane(origin=(-3, 4.773604886, 4.773604886), z_dir=(-1, 0, 0)), keep=Keep.TOP, mode=Mode.PRIVATE)
    redondeo4_piece_35 = redondeo4_piece_35a & redondeo4_piece_35b
    add(redondeo4_piece_35, mode=Mode.SUBTRACT)
    with BuildSketch(Plane(origin=(-3, 5, 5), x_dir=(0, -1, 0), z_dir=(0, 0, 1))) as redondeo4_piece_36a_section:
        with BuildLine():
            CenterArc((REDONDEO4_R, -REDONDEO4_R), REDONDEO4_R, 90, 90)
            Line((0, -REDONDEO4_R), (0, 0))
            Line((0, 0), (REDONDEO4_R, 0))
        make_face()
    redondeo4_piece_36a = extrude(amount=3.5, mode=Mode.PRIVATE)
    redondeo4_piece_36a = split(redondeo4_piece_36a, bisect_by=Plane(origin=(-3.226395114, 4.773604886, 6), z_dir=(0, 0, 1)), keep=Keep.TOP, mode=Mode.PRIVATE)
    with BuildSketch(Plane(origin=(4.5, 5, 6), x_dir=(0, -1, 0), z_dir=(-1, 0, 0))) as redondeo4_piece_36b_section:
        with BuildLine():
            CenterArc((REDONDEO4_R, REDONDEO4_R), REDONDEO4_R, 180, 90)
            Line((0, REDONDEO4_R), (0, 0))
            Line((0, 0), (REDONDEO4_R, 0))
        make_face()
    redondeo4_piece_36b = extrude(amount=10, mode=Mode.PRIVATE)
    redondeo4_piece_36b = split(redondeo4_piece_36b, bisect_by=Plane(origin=(-3, 4.773604886, 6.226395114), z_dir=(-1, 0, 0)), keep=Keep.TOP, mode=Mode.PRIVATE)
    redondeo4_piece_36 = redondeo4_piece_36a & redondeo4_piece_36b
    add(redondeo4_piece_36, mode=Mode.SUBTRACT)


solid = part.part
